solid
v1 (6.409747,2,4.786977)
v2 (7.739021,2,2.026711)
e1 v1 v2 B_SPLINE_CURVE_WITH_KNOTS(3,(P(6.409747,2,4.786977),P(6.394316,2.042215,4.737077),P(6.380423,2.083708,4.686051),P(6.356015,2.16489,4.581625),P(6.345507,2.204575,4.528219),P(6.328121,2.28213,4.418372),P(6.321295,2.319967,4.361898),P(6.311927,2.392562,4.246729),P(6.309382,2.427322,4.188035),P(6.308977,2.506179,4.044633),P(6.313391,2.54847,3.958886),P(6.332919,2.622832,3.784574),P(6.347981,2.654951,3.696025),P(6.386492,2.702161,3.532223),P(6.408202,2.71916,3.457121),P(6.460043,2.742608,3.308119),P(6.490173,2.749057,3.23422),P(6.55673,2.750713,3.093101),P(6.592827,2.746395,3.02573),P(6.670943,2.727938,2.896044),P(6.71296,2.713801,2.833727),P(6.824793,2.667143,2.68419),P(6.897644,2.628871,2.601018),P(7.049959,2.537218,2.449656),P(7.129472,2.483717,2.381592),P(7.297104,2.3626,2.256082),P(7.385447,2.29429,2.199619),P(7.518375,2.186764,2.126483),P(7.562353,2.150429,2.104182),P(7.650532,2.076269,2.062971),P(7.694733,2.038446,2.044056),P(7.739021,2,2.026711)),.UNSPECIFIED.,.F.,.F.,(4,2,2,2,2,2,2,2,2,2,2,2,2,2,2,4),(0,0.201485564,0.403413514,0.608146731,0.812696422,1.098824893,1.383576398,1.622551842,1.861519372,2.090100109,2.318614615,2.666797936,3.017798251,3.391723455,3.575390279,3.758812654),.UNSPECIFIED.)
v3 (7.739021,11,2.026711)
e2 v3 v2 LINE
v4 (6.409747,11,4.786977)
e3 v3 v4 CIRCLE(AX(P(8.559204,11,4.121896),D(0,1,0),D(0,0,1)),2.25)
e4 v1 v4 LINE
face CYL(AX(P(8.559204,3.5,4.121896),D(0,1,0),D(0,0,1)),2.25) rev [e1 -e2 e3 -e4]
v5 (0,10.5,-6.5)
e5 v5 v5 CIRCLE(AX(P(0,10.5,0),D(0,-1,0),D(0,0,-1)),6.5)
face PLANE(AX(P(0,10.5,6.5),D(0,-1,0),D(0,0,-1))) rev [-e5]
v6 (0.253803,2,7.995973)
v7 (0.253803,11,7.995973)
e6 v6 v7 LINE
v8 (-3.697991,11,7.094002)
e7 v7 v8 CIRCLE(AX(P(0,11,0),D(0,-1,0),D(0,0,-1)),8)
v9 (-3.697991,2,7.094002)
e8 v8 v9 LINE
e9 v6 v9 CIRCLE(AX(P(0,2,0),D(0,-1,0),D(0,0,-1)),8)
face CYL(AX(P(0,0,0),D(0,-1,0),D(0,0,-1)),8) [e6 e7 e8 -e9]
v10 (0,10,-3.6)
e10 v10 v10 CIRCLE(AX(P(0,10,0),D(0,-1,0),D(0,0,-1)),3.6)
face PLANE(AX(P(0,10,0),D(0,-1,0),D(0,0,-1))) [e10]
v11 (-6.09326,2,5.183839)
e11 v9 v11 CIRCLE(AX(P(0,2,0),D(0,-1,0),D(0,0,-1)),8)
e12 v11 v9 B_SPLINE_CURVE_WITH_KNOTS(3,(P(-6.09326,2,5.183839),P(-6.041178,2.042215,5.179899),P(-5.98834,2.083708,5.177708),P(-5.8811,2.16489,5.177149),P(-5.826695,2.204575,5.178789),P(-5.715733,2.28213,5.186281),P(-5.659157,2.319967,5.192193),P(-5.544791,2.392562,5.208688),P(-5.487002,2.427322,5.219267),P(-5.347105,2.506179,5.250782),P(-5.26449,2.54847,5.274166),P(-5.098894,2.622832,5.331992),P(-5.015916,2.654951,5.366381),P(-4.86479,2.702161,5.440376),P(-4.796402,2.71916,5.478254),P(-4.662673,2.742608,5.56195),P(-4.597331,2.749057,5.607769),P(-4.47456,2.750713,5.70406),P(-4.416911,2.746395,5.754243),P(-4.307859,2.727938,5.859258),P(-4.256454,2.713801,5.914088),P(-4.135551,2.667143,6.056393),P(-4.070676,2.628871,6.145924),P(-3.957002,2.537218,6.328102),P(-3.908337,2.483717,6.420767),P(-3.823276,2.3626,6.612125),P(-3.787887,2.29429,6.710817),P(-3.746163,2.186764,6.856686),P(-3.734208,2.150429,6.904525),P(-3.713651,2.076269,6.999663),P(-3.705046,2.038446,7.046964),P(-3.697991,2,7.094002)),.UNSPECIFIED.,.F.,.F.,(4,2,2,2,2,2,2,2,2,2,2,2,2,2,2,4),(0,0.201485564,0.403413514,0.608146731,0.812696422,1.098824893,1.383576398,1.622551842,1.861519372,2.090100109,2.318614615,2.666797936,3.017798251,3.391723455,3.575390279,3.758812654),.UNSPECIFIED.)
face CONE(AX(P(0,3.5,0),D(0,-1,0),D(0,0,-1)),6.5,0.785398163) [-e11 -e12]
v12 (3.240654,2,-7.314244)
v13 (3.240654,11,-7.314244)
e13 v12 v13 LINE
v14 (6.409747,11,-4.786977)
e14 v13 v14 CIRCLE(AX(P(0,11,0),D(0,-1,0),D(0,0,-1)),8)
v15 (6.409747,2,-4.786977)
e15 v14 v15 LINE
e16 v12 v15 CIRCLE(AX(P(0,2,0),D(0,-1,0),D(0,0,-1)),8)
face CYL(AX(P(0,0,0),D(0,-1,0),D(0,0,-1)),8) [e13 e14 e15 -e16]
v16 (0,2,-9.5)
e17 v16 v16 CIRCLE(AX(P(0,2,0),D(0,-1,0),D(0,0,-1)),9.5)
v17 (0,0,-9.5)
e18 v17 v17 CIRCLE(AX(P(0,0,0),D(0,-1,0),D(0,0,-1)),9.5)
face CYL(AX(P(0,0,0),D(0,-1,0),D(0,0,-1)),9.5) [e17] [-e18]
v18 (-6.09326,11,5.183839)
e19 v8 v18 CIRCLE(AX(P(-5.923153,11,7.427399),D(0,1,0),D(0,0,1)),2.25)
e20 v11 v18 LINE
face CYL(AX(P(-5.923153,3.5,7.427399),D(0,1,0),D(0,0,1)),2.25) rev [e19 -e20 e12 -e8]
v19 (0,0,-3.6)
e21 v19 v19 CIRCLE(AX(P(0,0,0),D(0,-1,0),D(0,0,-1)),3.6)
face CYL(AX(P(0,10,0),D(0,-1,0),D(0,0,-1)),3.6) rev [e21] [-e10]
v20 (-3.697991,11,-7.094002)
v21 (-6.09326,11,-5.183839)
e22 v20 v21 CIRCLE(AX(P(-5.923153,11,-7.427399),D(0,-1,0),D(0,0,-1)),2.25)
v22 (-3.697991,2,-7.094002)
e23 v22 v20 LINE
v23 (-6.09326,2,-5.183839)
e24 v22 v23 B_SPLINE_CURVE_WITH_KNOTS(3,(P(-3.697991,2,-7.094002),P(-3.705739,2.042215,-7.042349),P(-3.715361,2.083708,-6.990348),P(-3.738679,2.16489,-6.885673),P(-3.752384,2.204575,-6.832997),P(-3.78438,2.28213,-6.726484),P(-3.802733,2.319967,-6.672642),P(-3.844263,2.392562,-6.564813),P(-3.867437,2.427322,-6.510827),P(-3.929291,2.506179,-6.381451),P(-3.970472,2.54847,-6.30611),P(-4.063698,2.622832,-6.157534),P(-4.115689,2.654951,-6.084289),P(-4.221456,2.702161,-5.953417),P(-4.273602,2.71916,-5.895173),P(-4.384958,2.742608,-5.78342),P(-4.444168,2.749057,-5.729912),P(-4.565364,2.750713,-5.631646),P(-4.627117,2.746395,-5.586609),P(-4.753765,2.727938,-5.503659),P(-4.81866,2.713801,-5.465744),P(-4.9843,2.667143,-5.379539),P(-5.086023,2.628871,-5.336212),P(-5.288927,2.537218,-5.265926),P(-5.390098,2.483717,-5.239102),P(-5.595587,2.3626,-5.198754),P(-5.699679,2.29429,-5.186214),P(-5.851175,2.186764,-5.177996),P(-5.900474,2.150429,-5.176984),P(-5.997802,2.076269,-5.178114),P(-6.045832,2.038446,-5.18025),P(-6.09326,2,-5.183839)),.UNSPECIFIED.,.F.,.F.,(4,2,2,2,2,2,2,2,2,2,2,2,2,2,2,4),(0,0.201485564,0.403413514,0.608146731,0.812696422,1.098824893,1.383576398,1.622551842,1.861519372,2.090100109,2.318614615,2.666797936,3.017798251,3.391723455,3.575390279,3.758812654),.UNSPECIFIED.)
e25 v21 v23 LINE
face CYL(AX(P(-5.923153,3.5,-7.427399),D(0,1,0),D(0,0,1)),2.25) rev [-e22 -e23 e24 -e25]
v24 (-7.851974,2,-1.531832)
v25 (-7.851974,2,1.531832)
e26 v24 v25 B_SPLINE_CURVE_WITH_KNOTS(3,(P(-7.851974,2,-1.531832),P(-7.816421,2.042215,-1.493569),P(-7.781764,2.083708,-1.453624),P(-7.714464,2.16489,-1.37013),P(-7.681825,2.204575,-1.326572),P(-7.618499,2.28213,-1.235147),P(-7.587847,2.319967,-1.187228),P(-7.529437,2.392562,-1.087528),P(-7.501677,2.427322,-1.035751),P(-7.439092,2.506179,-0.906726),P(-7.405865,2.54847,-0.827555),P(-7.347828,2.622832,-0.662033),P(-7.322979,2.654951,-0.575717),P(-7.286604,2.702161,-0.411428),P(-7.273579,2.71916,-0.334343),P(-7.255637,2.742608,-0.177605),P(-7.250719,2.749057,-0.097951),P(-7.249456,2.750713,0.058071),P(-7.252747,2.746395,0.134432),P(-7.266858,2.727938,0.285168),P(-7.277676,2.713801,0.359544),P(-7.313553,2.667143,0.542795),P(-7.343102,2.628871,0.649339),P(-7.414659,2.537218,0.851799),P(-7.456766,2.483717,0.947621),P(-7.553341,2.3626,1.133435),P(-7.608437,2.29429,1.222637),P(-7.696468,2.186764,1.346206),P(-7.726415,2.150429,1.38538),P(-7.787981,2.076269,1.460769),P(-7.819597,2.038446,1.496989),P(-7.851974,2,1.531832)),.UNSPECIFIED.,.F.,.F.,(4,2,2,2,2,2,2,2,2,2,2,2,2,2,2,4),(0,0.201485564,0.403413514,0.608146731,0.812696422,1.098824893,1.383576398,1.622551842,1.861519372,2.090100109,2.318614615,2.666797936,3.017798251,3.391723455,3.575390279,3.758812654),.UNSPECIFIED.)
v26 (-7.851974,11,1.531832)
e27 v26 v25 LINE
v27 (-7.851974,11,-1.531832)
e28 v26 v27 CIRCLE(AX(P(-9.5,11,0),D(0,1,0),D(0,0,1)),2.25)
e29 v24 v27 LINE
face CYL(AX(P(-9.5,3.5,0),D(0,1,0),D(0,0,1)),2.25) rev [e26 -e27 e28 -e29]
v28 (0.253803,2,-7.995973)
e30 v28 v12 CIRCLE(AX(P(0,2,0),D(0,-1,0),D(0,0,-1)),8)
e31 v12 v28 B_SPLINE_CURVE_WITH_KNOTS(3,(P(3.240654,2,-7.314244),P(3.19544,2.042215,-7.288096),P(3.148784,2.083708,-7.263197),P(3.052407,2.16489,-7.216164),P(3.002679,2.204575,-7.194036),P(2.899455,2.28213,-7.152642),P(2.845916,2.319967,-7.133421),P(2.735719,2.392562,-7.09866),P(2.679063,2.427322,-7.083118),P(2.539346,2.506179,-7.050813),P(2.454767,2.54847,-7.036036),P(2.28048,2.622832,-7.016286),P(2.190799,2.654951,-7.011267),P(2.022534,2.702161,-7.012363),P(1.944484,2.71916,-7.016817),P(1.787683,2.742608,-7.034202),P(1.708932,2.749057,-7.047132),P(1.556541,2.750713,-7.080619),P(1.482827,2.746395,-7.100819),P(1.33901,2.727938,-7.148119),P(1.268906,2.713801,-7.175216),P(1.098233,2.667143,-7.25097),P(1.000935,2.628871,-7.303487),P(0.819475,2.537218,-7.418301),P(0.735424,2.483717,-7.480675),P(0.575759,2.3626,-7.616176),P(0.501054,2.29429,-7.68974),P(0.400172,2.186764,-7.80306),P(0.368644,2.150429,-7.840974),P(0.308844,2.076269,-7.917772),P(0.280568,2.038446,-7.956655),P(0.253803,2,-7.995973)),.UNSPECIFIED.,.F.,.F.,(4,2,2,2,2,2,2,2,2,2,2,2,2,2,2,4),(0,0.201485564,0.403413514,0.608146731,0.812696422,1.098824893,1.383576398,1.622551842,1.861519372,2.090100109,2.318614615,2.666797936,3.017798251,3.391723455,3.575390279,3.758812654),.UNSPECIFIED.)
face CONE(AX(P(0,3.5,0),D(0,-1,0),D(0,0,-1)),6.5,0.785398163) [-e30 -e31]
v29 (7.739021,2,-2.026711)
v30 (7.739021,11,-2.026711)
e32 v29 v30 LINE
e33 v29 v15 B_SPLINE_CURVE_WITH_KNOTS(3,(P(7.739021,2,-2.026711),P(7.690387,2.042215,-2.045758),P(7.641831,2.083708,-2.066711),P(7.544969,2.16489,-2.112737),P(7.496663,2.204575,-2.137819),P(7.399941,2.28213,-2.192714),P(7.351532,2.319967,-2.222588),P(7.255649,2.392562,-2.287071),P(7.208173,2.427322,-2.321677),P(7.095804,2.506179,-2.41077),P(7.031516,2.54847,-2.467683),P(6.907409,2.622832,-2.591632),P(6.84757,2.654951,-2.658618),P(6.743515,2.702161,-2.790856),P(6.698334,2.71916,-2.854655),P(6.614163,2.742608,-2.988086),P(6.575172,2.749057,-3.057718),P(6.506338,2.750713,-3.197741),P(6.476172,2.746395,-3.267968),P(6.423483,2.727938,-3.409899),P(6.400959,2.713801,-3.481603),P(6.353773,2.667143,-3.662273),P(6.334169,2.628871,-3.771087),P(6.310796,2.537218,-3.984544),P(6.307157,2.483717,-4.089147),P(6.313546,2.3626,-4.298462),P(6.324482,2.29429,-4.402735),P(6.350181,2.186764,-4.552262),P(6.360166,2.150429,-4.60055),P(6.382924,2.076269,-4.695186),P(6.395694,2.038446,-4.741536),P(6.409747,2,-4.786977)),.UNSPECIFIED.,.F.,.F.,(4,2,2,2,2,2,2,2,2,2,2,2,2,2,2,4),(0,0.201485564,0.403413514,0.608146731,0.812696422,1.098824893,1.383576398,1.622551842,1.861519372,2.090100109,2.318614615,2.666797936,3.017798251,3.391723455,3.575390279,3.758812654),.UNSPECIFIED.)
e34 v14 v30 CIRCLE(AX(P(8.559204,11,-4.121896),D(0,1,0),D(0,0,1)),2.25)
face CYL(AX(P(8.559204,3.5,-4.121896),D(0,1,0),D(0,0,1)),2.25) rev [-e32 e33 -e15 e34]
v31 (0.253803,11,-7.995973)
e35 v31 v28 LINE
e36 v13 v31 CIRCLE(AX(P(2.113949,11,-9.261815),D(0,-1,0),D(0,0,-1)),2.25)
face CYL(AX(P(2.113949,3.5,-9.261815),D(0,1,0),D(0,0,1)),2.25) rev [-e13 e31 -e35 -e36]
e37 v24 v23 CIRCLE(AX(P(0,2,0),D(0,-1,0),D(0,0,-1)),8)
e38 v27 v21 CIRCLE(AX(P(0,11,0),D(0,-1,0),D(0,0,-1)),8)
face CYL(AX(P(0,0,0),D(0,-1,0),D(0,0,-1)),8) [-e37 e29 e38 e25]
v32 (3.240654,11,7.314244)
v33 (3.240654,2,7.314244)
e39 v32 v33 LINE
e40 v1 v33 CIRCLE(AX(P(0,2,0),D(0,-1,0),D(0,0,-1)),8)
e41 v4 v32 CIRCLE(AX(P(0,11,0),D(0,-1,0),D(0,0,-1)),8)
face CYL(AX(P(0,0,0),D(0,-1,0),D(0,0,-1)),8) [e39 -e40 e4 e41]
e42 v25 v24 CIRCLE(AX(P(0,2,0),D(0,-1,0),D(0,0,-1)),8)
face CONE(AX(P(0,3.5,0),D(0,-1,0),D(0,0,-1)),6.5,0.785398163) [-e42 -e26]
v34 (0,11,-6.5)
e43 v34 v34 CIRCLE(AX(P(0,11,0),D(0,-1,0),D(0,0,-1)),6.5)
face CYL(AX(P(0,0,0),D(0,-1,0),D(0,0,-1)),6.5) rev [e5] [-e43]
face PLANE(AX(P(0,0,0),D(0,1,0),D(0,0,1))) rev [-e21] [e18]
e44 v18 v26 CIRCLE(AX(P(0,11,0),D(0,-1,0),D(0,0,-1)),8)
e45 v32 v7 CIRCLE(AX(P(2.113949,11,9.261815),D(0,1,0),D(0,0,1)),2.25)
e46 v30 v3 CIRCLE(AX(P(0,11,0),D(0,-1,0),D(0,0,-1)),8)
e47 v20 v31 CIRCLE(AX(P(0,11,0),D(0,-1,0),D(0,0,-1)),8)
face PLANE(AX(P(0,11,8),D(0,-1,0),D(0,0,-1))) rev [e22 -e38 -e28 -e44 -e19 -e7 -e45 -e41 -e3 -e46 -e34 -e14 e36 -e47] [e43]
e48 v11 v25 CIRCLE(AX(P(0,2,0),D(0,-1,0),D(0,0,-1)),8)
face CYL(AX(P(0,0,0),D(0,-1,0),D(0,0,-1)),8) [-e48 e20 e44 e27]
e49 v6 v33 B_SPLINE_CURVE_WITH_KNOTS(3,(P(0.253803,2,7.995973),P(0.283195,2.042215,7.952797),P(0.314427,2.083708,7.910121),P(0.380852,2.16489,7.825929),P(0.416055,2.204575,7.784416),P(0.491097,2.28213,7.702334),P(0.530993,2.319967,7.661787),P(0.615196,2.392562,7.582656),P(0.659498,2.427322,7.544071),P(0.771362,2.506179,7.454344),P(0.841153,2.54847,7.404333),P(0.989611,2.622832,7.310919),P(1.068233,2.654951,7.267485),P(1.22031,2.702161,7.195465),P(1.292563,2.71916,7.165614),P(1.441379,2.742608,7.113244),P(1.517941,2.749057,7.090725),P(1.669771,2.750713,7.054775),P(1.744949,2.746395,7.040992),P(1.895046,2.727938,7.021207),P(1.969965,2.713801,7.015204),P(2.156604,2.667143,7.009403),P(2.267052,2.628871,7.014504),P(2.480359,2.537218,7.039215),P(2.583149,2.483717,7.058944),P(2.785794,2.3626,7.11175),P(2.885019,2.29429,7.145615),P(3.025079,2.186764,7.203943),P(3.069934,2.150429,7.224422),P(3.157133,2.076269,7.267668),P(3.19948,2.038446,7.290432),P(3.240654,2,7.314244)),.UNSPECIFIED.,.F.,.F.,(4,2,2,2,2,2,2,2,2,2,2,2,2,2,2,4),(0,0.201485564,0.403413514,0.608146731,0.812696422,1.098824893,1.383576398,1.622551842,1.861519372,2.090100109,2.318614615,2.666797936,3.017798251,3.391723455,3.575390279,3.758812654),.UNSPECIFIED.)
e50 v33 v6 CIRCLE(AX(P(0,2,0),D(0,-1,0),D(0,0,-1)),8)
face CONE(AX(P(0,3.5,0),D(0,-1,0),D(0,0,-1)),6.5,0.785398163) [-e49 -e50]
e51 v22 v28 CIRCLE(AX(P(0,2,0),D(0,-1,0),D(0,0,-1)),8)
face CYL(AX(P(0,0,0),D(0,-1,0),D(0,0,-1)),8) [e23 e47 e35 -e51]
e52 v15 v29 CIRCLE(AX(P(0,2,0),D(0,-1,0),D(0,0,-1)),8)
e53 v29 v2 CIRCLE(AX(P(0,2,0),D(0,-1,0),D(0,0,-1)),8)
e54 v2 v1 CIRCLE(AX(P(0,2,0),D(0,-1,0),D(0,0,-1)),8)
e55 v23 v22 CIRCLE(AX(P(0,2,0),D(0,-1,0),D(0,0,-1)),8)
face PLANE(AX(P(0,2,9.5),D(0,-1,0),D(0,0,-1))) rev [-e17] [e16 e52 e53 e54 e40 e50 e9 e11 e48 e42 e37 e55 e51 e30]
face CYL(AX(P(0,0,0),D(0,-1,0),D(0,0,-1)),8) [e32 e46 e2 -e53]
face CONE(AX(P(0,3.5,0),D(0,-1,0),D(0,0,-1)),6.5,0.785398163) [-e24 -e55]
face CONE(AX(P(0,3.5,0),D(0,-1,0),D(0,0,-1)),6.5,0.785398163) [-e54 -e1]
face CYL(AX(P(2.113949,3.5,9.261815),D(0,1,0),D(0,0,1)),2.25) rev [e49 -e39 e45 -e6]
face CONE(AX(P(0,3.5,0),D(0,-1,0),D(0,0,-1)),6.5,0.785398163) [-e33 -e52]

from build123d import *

# Parameters (mm, degrees)
SKETCH2_R          = 3.6
CUT_EXTRUDE1_DEPTH = 10
SKETCH3_R          = 2.25
CUT_EXTRUDE2_DEPTH = 7.5
CHAMFER1_SIZE      = 1.5


with BuildPart() as part:
    # Sketch1 → Revolve1 (revolve)
    with BuildSketch(Plane(origin=(0, 0, 0), x_dir=(0, 0, -1), z_dir=(1, 0, 0)), mode=Mode.PRIVATE) as revolve1_sk:
        Polygon((0, 0), (-9.5, 0), (-9.5, 2), (-8, 2), (-8, 11), (-6.5, 11), (-6.5, 10.5), (0, 10.5), align=None)
    revolve(revolve1_sk.sketch.rotate(Axis((0, 0, 0), (0, 1, 0)), 180), axis=Axis((0, 0, 0), (0, 1, 0)))

    # Sketch2 → Cut-Extrude1 (cut)
    with BuildSketch(Plane.XZ):
        with Locations(Location((0, 0, 0), (0, 0, 270))):
            Circle(SKETCH2_R)
    extrude(amount=-CUT_EXTRUDE1_DEPTH, mode=Mode.SUBTRACT)

    # Sketch3 → Cut-Extrude2 (cut)
    with BuildSketch(Plane(origin=(0, 11, 0), x_dir=(1, 0, 0), z_dir=(0, 1, 0))):
        with Locations((-9.5, 0)):
            Circle(SKETCH3_R)
        with Locations((-5.923153118, 7.427399083)):
            Circle(SKETCH3_R)
        with Locations((2.113948873, 9.261815166)):
            Circle(SKETCH3_R)
        with Locations((8.559204245, 4.121895522)):
            Circle(SKETCH3_R)
        with Locations((8.559204245, -4.121895522)):
            Circle(SKETCH3_R)
        with Locations((2.113948873, -9.261815166)):
            Circle(SKETCH3_R)
        with Locations((-5.923153118, -7.427399083)):
            Circle(SKETCH3_R)
    extrude(amount=-CUT_EXTRUDE2_DEPTH, mode=Mode.SUBTRACT)

    # Chamfer1
    # the kernel refuses this chamfer: 1.5 mm, written as the material it takes off along each edge
    with BuildSketch(Plane(origin=(0, 3.5, 0), x_dir=(-0.43539008787732036, 0, 0.9002418960358263), z_dir=(-0.9002418960358263, 0, -0.43539008787732036))) as chamfer1_piece_1_section:
        Polygon((8, -CHAMFER1_SIZE), (8 - CHAMFER1_SIZE, 0), (8, 0), align=None)
    chamfer1_piece_1 = revolve(axis=Axis((0, 3.5, 0), (0, 1, 0)), revolution_arc=77.334522456, mode=Mode.PRIVATE)
    chamfer1_piece_1 = split(chamfer1_piece_1, bisect_by=Plane(origin=(1.717555098, 2, 7.525103296), z_dir=(0, 1, 0)), keep=Keep.TOP, mode=Mode.PRIVATE)
    chamfer1_piece_1 = chamfer1_piece_1 & Plane(origin=(2.113948873, 2.875825312, 9.261815166), x_dir=(1, 0, 0), z_dir=(0, 1, 0)) * Cylinder(2.25, 33, mode=Mode.PRIVATE)
    add(chamfer1_piece_1, mode=Mode.SUBTRACT)
    with BuildSketch(Plane(origin=(0, 3.5, 0), x_dir=(-0.975298735779407, 0, 0.2208899635272972), z_dir=(-0.2208899635272972, 0, -0.975298735779407))) as chamfer1_piece_2_section:
        Polygon((8, -CHAMFER1_SIZE), (8 - CHAMFER1_SIZE, 0), (8, 0), align=None)
    chamfer1_piece_2 = revolve(axis=Axis((0, 3.5, 0), (0, 1, 0)), revolution_arc=77.334522456, mode=Mode.PRIVATE)
    chamfer1_piece_2 = split(chamfer1_piece_2, bisect_by=Plane(origin=(-4.812484572, 2, 6.034663839), z_dir=(0, 1, 0)), keep=Keep.TOP, mode=Mode.PRIVATE)
    chamfer1_piece_2 = chamfer1_piece_2 & Plane(origin=(-5.923153118, 2.875825413, 7.427399083), x_dir=(1, 0, 0), z_dir=(0, 1, 0)) * Cylinder(2.25, 32, mode=Mode.PRIVATE)
    add(chamfer1_piece_2, mode=Mode.SUBTRACT)
    with BuildSketch(Plane(origin=(0, 3.5, 0), x_dir=(-0.7807875431710312, 0, -0.624796616851392), z_dir=(0.624796616851392, 0, -0.7807875431710312))) as chamfer1_piece_3_section:
        Polygon((8, -CHAMFER1_SIZE), (8 - CHAMFER1_SIZE, 0), (8, 0), align=None)
    chamfer1_piece_3 = revolve(axis=Axis((0, 3.5, 0), (0, 1, 0)), revolution_arc=77.334522456, mode=Mode.PRIVATE)
    chamfer1_piece_3 = split(chamfer1_piece_3, bisect_by=Plane(origin=(-7.718624937, 2, -1.33e-07), z_dir=(0, 1, 0)), keep=Keep.TOP, mode=Mode.PRIVATE)
    chamfer1_piece_3 = chamfer1_piece_3 & Plane(origin=(-9.5, 2.875824947, 0), x_dir=(1, 0, 0), z_dir=(0, 1, 0)) * Cylinder(2.25, 32, mode=Mode.PRIVATE)
    add(chamfer1_piece_3, mode=Mode.SUBTRACT)
    with BuildSketch(Plane(origin=(0, 3.5, 0), x_dir=(0.0016725946084597224, 0, -0.9999986012126596), z_dir=(0.9999986012126596, 0, 0.0016725946084597224))) as chamfer1_piece_4_section:
        Polygon((8, -CHAMFER1_SIZE), (8 - CHAMFER1_SIZE, 0), (8, 0), align=None)
    chamfer1_piece_4 = revolve(axis=Axis((0, 3.5, 0), (0, 1, 0)), revolution_arc=77.334522456, mode=Mode.PRIVATE)
    chamfer1_piece_4 = split(chamfer1_piece_4, bisect_by=Plane(origin=(-4.81248369, 2, -6.034664462), z_dir=(0, 1, 0)), keep=Keep.TOP, mode=Mode.PRIVATE)
    chamfer1_piece_4 = chamfer1_piece_4 & Plane(origin=(-5.923153118, 2.875825391, -7.427399083), x_dir=(1, 0, 0), z_dir=(0, 1, 0)) * Cylinder(2.25, 32, mode=Mode.PRIVATE)
    add(chamfer1_piece_4, mode=Mode.SUBTRACT)
    with BuildSketch(Plane(origin=(0, 3.5, 0), x_dir=(0.782873234533069, 0, -0.6221812426067909), z_dir=(0.6221812426067909, 0, 0.782873234533069))) as chamfer1_piece_5_section:
        Polygon((8, -CHAMFER1_SIZE), (8 - CHAMFER1_SIZE, 0), (8, 0), align=None)
    chamfer1_piece_5 = revolve(axis=Axis((0, 3.5, 0), (0, 1, 0)), revolution_arc=77.334522456, mode=Mode.PRIVATE)
    chamfer1_piece_5 = split(chamfer1_piece_5, bisect_by=Plane(origin=(1.717556284, 2, -7.525103041), z_dir=(0, 1, 0)), keep=Keep.TOP, mode=Mode.PRIVATE)
    chamfer1_piece_5 = chamfer1_piece_5 & Plane(origin=(2.113948873, 2.875825447, -9.261815166), x_dir=(1, 0, 0), z_dir=(0, 1, 0)) * Cylinder(2.25, 32, mode=Mode.PRIVATE)
    add(chamfer1_piece_5, mode=Mode.SUBTRACT)
    with BuildSketch(Plane(origin=(0, 3.5, 0), x_dir=(0.9745543611505972, 0, 0.22415128186640224), z_dir=(-0.22415128186640224, 0, 0.9745543611505972))) as chamfer1_piece_6_section:
        Polygon((8, -CHAMFER1_SIZE), (8 - CHAMFER1_SIZE, 0), (8, 0), align=None)
    chamfer1_piece_6 = revolve(axis=Axis((0, 3.5, 0), (0, 1, 0)), revolution_arc=77.334522456, mode=Mode.PRIVATE)
    chamfer1_piece_6 = split(chamfer1_piece_6, bisect_by=Plane(origin=(6.9542413, 2, -3.34898542), z_dir=(0, 1, 0)), keep=Keep.TOP, mode=Mode.PRIVATE)
    chamfer1_piece_6 = chamfer1_piece_6 & Plane(origin=(8.559204245, 2.875825426, -4.121895522), x_dir=(1, 0, 0), z_dir=(0, 1, 0)) * Cylinder(2.25, 32, mode=Mode.PRIVATE)
    add(chamfer1_piece_6, mode=Mode.SUBTRACT)
    with BuildSketch(Plane(origin=(0, 3.5, 0), x_dir=(0.43237617653563165, 0, 0.9016933192413196), z_dir=(-0.9016933192413196, 0, 0.43237617653563165))) as chamfer1_piece_7_section:
        Polygon((8, -CHAMFER1_SIZE), (8 - CHAMFER1_SIZE, 0), (8, 0), align=None)
    chamfer1_piece_7 = revolve(axis=Axis((0, 3.5, 0), (0, 1, 0)), revolution_arc=77.334522456, mode=Mode.PRIVATE)
    chamfer1_piece_7 = split(chamfer1_piece_7, bisect_by=Plane(origin=(6.954240779, 2, 3.348986578), z_dir=(0, 1, 0)), keep=Keep.TOP, mode=Mode.PRIVATE)
    chamfer1_piece_7 = chamfer1_piece_7 & Plane(origin=(8.559204245, 2.875825449, 4.121895522), x_dir=(1, 0, 0), z_dir=(0, 1, 0)) * Cylinder(2.25, 32, mode=Mode.PRIVATE)
    add(chamfer1_piece_7, mode=Mode.SUBTRACT)


solid = part.part
